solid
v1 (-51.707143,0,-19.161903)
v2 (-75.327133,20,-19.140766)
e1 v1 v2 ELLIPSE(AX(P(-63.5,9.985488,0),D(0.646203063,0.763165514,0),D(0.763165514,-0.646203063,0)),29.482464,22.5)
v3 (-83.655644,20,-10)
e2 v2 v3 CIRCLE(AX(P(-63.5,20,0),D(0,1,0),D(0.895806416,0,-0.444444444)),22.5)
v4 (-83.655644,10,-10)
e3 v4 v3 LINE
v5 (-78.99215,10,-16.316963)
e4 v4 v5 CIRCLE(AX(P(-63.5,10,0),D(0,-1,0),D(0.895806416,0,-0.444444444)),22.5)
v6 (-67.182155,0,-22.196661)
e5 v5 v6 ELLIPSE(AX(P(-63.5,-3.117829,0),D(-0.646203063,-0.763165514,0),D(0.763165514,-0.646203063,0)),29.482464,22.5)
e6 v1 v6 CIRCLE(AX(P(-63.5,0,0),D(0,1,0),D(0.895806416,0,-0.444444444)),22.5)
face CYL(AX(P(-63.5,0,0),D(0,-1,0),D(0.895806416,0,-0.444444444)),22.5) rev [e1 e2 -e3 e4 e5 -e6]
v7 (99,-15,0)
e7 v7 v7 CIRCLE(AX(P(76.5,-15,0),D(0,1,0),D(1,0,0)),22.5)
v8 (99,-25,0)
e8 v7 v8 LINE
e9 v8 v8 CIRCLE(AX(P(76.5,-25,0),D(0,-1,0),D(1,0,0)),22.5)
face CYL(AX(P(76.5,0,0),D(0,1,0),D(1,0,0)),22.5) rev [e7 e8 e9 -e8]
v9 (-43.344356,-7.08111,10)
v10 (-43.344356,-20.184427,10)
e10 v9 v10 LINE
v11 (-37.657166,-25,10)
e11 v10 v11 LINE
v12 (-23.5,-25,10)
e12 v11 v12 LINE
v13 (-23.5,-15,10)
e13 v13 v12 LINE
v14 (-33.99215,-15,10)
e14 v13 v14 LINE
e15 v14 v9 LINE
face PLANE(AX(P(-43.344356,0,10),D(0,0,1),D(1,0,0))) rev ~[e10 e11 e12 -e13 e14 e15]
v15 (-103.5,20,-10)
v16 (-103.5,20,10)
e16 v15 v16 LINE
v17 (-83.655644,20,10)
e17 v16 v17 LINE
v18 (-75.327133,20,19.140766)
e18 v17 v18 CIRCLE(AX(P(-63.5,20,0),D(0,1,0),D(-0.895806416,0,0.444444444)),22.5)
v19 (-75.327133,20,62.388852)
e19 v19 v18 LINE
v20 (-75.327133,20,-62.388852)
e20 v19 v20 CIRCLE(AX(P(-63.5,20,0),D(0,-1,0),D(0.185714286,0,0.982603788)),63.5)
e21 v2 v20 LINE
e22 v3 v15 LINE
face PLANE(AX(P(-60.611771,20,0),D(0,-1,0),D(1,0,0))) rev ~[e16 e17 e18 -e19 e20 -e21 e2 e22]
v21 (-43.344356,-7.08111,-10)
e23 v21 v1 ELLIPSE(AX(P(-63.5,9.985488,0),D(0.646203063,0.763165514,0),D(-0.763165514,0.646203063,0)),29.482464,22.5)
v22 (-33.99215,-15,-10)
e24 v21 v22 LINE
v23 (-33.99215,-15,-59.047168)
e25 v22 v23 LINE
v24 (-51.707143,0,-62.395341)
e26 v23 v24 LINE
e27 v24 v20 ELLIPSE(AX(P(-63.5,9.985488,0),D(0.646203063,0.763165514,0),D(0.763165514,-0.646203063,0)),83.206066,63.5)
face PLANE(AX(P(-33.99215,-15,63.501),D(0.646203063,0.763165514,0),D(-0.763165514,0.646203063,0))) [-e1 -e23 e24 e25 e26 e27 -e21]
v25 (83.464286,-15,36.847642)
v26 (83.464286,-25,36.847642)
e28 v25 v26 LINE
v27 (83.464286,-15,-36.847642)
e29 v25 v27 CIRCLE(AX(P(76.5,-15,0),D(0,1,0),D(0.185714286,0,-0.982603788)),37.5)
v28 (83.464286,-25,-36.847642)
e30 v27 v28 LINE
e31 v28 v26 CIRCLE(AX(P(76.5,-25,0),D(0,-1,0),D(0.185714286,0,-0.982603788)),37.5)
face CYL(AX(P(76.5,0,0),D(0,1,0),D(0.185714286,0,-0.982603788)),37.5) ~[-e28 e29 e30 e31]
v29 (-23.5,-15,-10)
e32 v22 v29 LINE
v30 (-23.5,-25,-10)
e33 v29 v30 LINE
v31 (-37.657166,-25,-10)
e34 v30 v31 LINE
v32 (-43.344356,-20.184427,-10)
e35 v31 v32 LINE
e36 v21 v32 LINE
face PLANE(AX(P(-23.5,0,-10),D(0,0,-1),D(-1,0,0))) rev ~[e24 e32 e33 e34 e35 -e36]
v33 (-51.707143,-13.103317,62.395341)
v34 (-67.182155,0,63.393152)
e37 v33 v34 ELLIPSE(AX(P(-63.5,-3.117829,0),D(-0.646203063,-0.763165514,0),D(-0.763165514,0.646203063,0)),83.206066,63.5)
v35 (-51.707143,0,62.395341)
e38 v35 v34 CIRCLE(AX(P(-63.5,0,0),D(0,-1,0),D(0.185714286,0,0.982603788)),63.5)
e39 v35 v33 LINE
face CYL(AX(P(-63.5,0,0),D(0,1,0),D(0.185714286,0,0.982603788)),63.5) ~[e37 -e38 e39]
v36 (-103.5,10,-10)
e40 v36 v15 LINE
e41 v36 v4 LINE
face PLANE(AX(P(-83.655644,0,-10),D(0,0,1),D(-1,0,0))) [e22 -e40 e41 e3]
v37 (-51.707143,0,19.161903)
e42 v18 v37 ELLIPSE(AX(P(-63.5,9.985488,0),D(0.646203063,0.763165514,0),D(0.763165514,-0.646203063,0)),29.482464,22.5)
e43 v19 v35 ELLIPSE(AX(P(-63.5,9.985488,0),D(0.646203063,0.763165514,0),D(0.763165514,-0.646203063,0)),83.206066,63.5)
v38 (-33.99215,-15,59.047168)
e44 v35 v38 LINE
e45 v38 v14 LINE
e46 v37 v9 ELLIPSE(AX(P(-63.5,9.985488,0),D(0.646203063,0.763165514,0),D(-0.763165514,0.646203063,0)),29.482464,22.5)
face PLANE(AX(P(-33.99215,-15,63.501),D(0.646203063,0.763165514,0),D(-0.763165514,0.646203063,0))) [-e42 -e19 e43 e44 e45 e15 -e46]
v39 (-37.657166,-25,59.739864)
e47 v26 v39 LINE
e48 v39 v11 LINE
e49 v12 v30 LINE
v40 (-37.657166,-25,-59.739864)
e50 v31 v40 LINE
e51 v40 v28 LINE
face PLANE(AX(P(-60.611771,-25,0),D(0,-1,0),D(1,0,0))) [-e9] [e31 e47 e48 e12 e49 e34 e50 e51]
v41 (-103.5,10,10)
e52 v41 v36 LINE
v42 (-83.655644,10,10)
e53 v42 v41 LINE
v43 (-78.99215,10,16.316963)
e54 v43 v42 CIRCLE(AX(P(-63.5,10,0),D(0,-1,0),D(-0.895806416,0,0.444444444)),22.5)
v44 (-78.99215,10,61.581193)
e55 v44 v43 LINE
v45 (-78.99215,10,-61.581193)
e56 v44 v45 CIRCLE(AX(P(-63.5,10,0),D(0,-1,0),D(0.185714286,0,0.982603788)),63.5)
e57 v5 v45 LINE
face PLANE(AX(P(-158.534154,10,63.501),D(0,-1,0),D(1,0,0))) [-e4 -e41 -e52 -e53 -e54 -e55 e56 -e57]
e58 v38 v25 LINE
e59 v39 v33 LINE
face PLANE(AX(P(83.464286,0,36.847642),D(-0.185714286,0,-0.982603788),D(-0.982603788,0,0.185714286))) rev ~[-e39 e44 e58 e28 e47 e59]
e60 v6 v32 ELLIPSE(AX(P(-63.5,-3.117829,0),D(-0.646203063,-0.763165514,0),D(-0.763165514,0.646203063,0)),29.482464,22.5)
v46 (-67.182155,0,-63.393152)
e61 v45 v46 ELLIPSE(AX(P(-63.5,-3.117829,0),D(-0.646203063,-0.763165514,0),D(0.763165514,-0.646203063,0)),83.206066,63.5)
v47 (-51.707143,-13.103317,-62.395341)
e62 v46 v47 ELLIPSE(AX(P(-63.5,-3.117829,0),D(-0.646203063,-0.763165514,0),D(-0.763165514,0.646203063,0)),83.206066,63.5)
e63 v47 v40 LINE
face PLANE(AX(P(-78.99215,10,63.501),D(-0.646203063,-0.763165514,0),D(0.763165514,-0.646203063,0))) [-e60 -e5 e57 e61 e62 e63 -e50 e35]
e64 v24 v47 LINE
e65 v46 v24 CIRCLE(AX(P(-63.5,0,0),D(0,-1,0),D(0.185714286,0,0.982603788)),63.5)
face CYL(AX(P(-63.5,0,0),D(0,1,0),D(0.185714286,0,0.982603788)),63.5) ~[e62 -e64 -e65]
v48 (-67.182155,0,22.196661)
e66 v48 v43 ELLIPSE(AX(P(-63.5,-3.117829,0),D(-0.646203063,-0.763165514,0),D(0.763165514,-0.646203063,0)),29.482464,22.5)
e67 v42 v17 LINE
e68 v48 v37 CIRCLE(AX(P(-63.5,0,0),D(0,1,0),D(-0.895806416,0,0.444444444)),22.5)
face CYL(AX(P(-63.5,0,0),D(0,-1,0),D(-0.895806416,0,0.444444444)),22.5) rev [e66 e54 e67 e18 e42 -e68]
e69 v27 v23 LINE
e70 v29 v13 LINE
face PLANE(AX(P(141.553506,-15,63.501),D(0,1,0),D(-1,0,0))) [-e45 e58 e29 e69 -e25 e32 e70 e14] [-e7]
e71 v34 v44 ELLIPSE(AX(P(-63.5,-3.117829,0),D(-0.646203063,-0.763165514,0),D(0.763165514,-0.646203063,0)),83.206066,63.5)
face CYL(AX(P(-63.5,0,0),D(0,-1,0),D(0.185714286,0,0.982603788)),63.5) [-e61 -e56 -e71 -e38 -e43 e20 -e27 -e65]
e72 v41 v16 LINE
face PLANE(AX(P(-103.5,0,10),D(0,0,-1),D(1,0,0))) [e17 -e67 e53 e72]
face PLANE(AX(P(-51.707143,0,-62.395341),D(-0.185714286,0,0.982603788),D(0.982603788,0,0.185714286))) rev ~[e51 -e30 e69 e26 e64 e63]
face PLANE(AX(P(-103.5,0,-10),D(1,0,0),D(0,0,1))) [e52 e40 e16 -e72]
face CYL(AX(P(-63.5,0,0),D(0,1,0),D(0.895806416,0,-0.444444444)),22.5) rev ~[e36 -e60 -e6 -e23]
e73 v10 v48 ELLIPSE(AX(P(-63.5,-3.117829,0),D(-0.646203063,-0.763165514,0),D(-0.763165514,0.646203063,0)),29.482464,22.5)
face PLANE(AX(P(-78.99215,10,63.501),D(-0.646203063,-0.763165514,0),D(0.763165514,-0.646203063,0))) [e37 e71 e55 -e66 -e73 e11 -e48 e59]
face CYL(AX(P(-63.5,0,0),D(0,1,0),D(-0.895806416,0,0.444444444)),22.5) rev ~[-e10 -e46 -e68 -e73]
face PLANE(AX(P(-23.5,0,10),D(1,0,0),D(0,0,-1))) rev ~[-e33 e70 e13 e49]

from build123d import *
from build123d import SkipClean  # not in build123d's __all__

# Parameters (mm, degrees)
F0_R     = 22.5
F1_DEPTH = 25
F2_DEPTH = 20
F4_START = 63.501
F4_DEPTH = 127.002


with BuildPart() as f1:
    # F0 (on Front) → F1 (new body)
    with BuildSketch(Plane.XZ):
        with BuildLine():
            ThreePointArc((-51.7071428571, -62.3953405344), (-14.6067671933, -40.5179193162), (0, 0))
            ThreePointArc((0, 0), (-14.6067671933, 40.5179193162), (-51.7071428571, 62.3953405344))
            ThreePointArc((-51.7071428571, 62.3953405344), (-127, 0), (-51.7071428571, -62.3953405344))
        make_face()
        with BuildLine():
            ThreePointArc((-83.6556443707, 10), (-63.5, 22.5), (-43.3443556293, 10))
            Line((-43.3443556293, 10), (-23.5, 10))
            Line((-23.5, 10), (-23.5, -10))
            Line((-23.5, -10), (-43.3443556293, -10))
            ThreePointArc((-43.3443556293, -10), (-63.5, -22.5), (-83.6556443707, -10))
            Line((-83.6556443707, -10), (-103.5, -10))
            Line((-103.5, -10), (-103.5, 10))
            Line((-103.5, 10), (-83.6556443707, 10))
        make_face(mode=Mode.SUBTRACT)
        with BuildLine():
            ThreePointArc((-51.7071428571, 62.3953405344), (-14.6067671933, 40.5179193162), (0, 0))
            ThreePointArc((0, 0), (-14.6067671933, -40.5179193162), (-51.7071428571, -62.3953405344))
            Line((-51.7071428571, -62.3953405344), (83.4642857143, -36.8476420479))
            ThreePointArc((83.4642857143, -36.8476420479), (39, 0), (83.4642857143, 36.8476420479))
            Line((83.4642857143, 36.8476420479), (-51.7071428571, 62.3953405344))
        make_face()
        with BuildLine():
            ThreePointArc((114, 0), (105.3739563819, 23.927905108), (83.4642857143, 36.8476420479))
            ThreePointArc((83.4642857143, 36.8476420479), (39, 0), (83.4642857143, -36.8476420479))
            ThreePointArc((83.4642857143, -36.8476420479), (105.3739563819, -23.927905108), (114, 0))
        make_face()
        with Locations((76.5, 0)):
            Circle(F0_R, mode=Mode.SUBTRACT)
    extrude(amount=F1_DEPTH)

    # F0 (on Front) → F2 (join)
    with BuildSketch(Plane.XZ):
        with BuildLine():
            ThreePointArc((-51.7071428571, -62.3953405344), (-14.6067671933, -40.5179193162), (0, 0))
            ThreePointArc((0, 0), (-14.6067671933, 40.5179193162), (-51.7071428571, 62.3953405344))
            ThreePointArc((-51.7071428571, 62.3953405344), (-127, 0), (-51.7071428571, -62.3953405344))
        make_face()
        with BuildLine():
            ThreePointArc((-83.6556443707, 10), (-63.5, 22.5), (-43.3443556293, 10))
            Line((-43.3443556293, 10), (-23.5, 10))
            Line((-23.5, 10), (-23.5, -10))
            Line((-23.5, -10), (-43.3443556293, -10))
            ThreePointArc((-43.3443556293, -10), (-63.5, -22.5), (-83.6556443707, -10))
            Line((-83.6556443707, -10), (-103.5, -10))
            Line((-103.5, -10), (-103.5, 10))
            Line((-103.5, 10), (-83.6556443707, 10))
        make_face(mode=Mode.SUBTRACT)
    with SkipClean():  # cleaning this boolean's faces spoils the solid; the shape is the same uncleaned
        extrude(amount=-F2_DEPTH)

    # F3 (on Top) → F4 (intersect)
    with BuildSketch(Plane.XY.offset(F4_START)):
        Polygon((-75.3271334507, 20), (-158.5341542959, 20), (-158.5341542959, 10), (-78.9921499119, 10), (-37.6571663732, -25), (141.5535062551, -25), (141.5535062551, -15), (-33.9921499119, -15), align=None)
    with SkipClean():  # cleaning this boolean's faces spoils the solid; the shape is the same uncleaned
        extrude(amount=-F4_DEPTH, mode=Mode.INTERSECT)


solid = f1.part
